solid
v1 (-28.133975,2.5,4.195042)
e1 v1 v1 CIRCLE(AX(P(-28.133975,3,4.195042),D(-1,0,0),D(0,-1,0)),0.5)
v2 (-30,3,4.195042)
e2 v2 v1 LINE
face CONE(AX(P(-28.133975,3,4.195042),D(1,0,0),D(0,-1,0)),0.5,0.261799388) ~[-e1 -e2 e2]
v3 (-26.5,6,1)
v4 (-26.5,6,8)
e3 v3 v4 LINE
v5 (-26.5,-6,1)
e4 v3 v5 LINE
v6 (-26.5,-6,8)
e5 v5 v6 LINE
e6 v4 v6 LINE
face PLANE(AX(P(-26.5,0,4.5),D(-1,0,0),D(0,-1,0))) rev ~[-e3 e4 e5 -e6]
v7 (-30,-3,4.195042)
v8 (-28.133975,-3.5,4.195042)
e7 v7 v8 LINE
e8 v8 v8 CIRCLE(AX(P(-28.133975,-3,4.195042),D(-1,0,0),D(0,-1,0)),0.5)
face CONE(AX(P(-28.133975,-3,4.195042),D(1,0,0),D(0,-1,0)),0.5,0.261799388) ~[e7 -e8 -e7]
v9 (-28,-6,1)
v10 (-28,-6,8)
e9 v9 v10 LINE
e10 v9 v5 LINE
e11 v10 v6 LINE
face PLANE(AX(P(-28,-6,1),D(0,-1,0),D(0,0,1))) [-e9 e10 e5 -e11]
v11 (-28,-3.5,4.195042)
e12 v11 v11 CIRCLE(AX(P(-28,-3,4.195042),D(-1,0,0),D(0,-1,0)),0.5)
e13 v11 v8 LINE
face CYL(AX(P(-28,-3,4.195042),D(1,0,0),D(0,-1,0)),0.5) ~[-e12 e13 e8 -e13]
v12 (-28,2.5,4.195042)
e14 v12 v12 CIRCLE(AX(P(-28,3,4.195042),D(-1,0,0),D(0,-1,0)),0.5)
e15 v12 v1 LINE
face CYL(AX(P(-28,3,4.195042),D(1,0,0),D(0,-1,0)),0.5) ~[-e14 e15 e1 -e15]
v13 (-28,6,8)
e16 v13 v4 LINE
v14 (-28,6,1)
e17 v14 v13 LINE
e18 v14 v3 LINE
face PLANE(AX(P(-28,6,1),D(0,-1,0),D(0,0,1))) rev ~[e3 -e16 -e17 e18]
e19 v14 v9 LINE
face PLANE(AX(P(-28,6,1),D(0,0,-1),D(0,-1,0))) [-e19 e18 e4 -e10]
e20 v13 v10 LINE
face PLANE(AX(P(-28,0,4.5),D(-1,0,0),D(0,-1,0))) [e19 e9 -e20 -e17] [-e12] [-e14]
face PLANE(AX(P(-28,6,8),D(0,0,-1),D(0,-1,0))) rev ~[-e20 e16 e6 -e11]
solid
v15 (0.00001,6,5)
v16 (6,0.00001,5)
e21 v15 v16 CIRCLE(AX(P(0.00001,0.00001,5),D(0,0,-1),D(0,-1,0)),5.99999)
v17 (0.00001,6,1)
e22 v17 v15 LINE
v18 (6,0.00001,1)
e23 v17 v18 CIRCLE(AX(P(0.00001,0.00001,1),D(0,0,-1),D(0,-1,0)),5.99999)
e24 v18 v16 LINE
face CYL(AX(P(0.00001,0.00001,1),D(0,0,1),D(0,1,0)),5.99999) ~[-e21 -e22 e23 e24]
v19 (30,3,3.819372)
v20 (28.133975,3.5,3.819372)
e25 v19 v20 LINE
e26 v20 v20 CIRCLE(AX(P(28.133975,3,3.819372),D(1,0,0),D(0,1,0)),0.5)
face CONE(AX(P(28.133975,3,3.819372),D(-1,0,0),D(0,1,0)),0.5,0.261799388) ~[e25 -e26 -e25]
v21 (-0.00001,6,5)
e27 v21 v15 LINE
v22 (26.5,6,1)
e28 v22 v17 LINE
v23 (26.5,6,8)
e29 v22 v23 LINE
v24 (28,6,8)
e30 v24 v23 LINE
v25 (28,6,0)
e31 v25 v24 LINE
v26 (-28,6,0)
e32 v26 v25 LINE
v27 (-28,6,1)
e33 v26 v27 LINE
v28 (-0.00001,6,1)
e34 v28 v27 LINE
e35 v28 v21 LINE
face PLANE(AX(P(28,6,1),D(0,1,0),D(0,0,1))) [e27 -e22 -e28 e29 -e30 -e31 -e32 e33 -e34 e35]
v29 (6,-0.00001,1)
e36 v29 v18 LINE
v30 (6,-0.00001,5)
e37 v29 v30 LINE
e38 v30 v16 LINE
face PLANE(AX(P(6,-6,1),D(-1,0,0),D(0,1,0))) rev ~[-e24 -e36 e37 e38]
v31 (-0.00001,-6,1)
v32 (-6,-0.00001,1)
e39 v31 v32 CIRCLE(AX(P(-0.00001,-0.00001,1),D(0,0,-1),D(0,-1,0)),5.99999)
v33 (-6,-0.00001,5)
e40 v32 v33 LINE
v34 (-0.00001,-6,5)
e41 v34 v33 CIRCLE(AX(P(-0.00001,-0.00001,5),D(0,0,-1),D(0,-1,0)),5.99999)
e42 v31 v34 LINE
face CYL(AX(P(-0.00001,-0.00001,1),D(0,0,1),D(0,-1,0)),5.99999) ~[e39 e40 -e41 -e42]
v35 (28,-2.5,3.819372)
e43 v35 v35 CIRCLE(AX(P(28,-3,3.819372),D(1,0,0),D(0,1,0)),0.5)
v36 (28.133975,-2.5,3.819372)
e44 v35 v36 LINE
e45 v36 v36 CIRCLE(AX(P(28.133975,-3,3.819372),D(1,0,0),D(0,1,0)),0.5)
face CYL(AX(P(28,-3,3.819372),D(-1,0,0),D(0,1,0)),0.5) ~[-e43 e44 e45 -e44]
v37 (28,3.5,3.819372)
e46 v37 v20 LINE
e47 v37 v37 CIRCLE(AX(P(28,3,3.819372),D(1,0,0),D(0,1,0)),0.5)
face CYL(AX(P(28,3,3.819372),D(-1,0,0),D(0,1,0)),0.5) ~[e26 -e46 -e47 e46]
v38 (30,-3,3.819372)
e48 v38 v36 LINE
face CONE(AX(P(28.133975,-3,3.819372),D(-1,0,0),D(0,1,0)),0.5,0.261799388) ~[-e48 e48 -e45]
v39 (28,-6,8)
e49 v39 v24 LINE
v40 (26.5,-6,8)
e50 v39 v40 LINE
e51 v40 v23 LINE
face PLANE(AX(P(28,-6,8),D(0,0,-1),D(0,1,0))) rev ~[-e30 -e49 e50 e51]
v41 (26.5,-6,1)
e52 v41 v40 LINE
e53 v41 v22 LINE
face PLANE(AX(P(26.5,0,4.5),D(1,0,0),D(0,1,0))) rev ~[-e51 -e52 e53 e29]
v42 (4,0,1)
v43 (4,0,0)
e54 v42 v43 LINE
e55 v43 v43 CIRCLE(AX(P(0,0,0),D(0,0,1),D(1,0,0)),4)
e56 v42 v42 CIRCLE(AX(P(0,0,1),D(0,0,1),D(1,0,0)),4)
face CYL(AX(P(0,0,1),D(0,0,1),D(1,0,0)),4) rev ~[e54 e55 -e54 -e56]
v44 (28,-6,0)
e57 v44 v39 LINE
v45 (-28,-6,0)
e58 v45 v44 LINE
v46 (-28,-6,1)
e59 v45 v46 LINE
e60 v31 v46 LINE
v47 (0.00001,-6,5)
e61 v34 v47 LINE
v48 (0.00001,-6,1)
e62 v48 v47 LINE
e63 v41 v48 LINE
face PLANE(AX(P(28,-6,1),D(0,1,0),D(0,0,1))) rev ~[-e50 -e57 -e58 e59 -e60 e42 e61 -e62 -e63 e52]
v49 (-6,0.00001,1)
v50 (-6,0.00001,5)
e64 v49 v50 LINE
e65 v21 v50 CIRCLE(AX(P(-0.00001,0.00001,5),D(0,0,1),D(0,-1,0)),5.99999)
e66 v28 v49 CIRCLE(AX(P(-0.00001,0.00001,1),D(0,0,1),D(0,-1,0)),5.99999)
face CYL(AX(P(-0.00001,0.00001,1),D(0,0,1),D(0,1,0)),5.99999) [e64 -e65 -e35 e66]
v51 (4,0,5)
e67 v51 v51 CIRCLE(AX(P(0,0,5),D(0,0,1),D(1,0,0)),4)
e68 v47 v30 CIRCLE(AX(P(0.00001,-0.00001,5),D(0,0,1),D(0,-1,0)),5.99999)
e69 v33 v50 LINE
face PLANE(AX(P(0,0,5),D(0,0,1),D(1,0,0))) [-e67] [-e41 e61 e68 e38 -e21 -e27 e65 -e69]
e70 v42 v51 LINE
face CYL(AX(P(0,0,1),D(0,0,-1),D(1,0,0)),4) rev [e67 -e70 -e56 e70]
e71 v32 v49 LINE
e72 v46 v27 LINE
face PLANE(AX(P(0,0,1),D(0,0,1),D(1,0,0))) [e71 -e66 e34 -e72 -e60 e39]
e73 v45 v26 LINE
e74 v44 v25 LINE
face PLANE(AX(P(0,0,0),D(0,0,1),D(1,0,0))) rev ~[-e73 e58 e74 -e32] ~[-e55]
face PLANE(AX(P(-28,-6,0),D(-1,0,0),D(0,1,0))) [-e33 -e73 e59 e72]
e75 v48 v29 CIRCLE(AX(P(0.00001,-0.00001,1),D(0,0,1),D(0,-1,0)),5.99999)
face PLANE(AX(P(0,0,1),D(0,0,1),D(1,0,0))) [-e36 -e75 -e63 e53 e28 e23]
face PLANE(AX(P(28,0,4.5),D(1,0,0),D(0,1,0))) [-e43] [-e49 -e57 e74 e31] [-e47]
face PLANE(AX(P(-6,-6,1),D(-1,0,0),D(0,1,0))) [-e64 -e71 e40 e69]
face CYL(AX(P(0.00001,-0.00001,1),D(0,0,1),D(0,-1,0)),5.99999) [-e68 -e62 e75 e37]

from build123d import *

# Parameters (mm, degrees)
F0_W        = 56
F0_H        = 12
F1_DEPTH    = 1
F2_W        = 12
F2_H        = 12
F2_R        = 4
F3_DEPTH    = 4
F4_DEPTH    = 25
F5_R        = 5.99999
F6_W        = 12
F6_H        = 7
F7_DEPTH    = 1.5
F8_W        = 12
F8_H        = 7
F9_DEPTH    = 1.5
F10_R       = 0.5
F11_DEPTH   = 2
F12_R       = 0.5
F13_DEPTH   = 2
F14_SIZE2   = 1.8660254038
F14_SIZE    = 0.5
F14_2_SIZE2 = 1.8660254038
F14_2_SIZE  = 0.5
F14_3_SIZE2 = 1.8660254038
F14_3_SIZE  = 0.5
F14_4_SIZE2 = 1.8660254038
F14_4_SIZE  = 0.5


# Not quite as in the source:
# - a fillet or chamfer is up to 0.001 mm smaller than in the source, because OpenCascade refuses the exact size


with BuildPart() as f1:
    # F0 (on Top) → F1 (new body)
    with BuildSketch(Plane.XY):
        Rectangle(F0_W, F0_H)
    extrude(amount=F1_DEPTH)

    # F2 (on face) → F3 (join)
    with BuildSketch(Plane.XY.offset(1)):
        Rectangle(F2_W, F2_H)
        Circle(F2_R, mode=Mode.SUBTRACT)
    extrude(amount=F3_DEPTH)

    # F4 (cut): a face of the model
    f4_faces = [f1.faces().sort_by_distance(p)[0] for p in [
        (0, 0, 1),
    ]]
    extrude(f4_faces, amount=-F4_DEPTH, mode=Mode.SUBTRACT)

    # F5 (radius 6 in the source; OpenCascade refuses exactly that, so slightly less here)
    f5_edges = [f1.edges().sort_by_distance(p)[0] for p in [
        (6, 6, 3),
        (6, -6, 3),
        (-6, -6, 3),
        (-6, 6, 3),
    ]]
    fillet(f5_edges, radius=F5_R)

    # F6 (on face) → F7 (join)
    with BuildSketch(Plane.YZ.offset(28)):
        with Locations((0, 4.5)):
            Rectangle(F6_W, F6_H)
    extrude(amount=-F7_DEPTH)

    # F10 (on face) → F11 (join)
    with BuildSketch(Plane.YZ.offset(28)):
        with Locations((3, 3.8193718065)):
            Circle(F10_R)
        with Locations((-3, 3.8193718065)):
            Circle(F10_R)
    extrude(amount=F11_DEPTH)

    # F14
    f14_edges = [f1.edges().sort_by_distance(p)[0] for p in [
        (30, 2.5, 3.819372),
    ]]
    f14_side = f1.faces().sort_by_distance((30, 3, 3.819372))[0]
    chamfer(f14_edges, length=F14_SIZE, length2=F14_SIZE2, reference=f14_side)

    # F14#2
    f14_2_edges = [f1.edges().sort_by_distance(p)[0] for p in [
        (30, -3.5, 3.819372),
    ]]
    f14_2_side = f1.faces().sort_by_distance((30, -3, 3.819372))[0]
    chamfer(f14_2_edges, length=F14_2_SIZE, length2=F14_2_SIZE2, reference=f14_2_side)


with BuildPart() as f9:
    # F8 (on face) → F9 (new body)
    with BuildSketch(Plane(origin=(-28, 0, 0), x_dir=(0, -1, 0), z_dir=(-1, 0, 0))):
        with Locations((0, 4.5)):
            Rectangle(F8_W, F8_H)
    extrude(amount=-F9_DEPTH)

    # F12 (on face) → F13 (join)
    with BuildSketch(Plane(origin=(-28, 0, 0), x_dir=(0, -1, 0), z_dir=(-1, 0, 0))):
        with Locations((3, 4.1950419545)):
            Circle(F12_R)
        with Locations((-3, 4.1950419545)):
            Circle(F12_R)
    extrude(amount=F13_DEPTH)

    # F14#3
    f14_3_edges = [f9.edges().sort_by_distance(p)[0] for p in [
        (-30, -2.5, 4.195042),
    ]]
    f14_3_side = f9.faces().sort_by_distance((-30, -3, 4.195042))[0]
    chamfer(f14_3_edges, length=F14_3_SIZE, length2=F14_3_SIZE2, reference=f14_3_side)

    # F14#4
    f14_4_edges = [f9.edges().sort_by_distance(p)[0] for p in [
        (-30, 3.5, 4.195042),
    ]]
    f14_4_side = f9.faces().sort_by_distance((-30, 3, 4.195042))[0]
    chamfer(f14_4_edges, length=F14_4_SIZE, length2=F14_4_SIZE2, reference=f14_4_side)


solid = Compound([f1.part, f9.part])
